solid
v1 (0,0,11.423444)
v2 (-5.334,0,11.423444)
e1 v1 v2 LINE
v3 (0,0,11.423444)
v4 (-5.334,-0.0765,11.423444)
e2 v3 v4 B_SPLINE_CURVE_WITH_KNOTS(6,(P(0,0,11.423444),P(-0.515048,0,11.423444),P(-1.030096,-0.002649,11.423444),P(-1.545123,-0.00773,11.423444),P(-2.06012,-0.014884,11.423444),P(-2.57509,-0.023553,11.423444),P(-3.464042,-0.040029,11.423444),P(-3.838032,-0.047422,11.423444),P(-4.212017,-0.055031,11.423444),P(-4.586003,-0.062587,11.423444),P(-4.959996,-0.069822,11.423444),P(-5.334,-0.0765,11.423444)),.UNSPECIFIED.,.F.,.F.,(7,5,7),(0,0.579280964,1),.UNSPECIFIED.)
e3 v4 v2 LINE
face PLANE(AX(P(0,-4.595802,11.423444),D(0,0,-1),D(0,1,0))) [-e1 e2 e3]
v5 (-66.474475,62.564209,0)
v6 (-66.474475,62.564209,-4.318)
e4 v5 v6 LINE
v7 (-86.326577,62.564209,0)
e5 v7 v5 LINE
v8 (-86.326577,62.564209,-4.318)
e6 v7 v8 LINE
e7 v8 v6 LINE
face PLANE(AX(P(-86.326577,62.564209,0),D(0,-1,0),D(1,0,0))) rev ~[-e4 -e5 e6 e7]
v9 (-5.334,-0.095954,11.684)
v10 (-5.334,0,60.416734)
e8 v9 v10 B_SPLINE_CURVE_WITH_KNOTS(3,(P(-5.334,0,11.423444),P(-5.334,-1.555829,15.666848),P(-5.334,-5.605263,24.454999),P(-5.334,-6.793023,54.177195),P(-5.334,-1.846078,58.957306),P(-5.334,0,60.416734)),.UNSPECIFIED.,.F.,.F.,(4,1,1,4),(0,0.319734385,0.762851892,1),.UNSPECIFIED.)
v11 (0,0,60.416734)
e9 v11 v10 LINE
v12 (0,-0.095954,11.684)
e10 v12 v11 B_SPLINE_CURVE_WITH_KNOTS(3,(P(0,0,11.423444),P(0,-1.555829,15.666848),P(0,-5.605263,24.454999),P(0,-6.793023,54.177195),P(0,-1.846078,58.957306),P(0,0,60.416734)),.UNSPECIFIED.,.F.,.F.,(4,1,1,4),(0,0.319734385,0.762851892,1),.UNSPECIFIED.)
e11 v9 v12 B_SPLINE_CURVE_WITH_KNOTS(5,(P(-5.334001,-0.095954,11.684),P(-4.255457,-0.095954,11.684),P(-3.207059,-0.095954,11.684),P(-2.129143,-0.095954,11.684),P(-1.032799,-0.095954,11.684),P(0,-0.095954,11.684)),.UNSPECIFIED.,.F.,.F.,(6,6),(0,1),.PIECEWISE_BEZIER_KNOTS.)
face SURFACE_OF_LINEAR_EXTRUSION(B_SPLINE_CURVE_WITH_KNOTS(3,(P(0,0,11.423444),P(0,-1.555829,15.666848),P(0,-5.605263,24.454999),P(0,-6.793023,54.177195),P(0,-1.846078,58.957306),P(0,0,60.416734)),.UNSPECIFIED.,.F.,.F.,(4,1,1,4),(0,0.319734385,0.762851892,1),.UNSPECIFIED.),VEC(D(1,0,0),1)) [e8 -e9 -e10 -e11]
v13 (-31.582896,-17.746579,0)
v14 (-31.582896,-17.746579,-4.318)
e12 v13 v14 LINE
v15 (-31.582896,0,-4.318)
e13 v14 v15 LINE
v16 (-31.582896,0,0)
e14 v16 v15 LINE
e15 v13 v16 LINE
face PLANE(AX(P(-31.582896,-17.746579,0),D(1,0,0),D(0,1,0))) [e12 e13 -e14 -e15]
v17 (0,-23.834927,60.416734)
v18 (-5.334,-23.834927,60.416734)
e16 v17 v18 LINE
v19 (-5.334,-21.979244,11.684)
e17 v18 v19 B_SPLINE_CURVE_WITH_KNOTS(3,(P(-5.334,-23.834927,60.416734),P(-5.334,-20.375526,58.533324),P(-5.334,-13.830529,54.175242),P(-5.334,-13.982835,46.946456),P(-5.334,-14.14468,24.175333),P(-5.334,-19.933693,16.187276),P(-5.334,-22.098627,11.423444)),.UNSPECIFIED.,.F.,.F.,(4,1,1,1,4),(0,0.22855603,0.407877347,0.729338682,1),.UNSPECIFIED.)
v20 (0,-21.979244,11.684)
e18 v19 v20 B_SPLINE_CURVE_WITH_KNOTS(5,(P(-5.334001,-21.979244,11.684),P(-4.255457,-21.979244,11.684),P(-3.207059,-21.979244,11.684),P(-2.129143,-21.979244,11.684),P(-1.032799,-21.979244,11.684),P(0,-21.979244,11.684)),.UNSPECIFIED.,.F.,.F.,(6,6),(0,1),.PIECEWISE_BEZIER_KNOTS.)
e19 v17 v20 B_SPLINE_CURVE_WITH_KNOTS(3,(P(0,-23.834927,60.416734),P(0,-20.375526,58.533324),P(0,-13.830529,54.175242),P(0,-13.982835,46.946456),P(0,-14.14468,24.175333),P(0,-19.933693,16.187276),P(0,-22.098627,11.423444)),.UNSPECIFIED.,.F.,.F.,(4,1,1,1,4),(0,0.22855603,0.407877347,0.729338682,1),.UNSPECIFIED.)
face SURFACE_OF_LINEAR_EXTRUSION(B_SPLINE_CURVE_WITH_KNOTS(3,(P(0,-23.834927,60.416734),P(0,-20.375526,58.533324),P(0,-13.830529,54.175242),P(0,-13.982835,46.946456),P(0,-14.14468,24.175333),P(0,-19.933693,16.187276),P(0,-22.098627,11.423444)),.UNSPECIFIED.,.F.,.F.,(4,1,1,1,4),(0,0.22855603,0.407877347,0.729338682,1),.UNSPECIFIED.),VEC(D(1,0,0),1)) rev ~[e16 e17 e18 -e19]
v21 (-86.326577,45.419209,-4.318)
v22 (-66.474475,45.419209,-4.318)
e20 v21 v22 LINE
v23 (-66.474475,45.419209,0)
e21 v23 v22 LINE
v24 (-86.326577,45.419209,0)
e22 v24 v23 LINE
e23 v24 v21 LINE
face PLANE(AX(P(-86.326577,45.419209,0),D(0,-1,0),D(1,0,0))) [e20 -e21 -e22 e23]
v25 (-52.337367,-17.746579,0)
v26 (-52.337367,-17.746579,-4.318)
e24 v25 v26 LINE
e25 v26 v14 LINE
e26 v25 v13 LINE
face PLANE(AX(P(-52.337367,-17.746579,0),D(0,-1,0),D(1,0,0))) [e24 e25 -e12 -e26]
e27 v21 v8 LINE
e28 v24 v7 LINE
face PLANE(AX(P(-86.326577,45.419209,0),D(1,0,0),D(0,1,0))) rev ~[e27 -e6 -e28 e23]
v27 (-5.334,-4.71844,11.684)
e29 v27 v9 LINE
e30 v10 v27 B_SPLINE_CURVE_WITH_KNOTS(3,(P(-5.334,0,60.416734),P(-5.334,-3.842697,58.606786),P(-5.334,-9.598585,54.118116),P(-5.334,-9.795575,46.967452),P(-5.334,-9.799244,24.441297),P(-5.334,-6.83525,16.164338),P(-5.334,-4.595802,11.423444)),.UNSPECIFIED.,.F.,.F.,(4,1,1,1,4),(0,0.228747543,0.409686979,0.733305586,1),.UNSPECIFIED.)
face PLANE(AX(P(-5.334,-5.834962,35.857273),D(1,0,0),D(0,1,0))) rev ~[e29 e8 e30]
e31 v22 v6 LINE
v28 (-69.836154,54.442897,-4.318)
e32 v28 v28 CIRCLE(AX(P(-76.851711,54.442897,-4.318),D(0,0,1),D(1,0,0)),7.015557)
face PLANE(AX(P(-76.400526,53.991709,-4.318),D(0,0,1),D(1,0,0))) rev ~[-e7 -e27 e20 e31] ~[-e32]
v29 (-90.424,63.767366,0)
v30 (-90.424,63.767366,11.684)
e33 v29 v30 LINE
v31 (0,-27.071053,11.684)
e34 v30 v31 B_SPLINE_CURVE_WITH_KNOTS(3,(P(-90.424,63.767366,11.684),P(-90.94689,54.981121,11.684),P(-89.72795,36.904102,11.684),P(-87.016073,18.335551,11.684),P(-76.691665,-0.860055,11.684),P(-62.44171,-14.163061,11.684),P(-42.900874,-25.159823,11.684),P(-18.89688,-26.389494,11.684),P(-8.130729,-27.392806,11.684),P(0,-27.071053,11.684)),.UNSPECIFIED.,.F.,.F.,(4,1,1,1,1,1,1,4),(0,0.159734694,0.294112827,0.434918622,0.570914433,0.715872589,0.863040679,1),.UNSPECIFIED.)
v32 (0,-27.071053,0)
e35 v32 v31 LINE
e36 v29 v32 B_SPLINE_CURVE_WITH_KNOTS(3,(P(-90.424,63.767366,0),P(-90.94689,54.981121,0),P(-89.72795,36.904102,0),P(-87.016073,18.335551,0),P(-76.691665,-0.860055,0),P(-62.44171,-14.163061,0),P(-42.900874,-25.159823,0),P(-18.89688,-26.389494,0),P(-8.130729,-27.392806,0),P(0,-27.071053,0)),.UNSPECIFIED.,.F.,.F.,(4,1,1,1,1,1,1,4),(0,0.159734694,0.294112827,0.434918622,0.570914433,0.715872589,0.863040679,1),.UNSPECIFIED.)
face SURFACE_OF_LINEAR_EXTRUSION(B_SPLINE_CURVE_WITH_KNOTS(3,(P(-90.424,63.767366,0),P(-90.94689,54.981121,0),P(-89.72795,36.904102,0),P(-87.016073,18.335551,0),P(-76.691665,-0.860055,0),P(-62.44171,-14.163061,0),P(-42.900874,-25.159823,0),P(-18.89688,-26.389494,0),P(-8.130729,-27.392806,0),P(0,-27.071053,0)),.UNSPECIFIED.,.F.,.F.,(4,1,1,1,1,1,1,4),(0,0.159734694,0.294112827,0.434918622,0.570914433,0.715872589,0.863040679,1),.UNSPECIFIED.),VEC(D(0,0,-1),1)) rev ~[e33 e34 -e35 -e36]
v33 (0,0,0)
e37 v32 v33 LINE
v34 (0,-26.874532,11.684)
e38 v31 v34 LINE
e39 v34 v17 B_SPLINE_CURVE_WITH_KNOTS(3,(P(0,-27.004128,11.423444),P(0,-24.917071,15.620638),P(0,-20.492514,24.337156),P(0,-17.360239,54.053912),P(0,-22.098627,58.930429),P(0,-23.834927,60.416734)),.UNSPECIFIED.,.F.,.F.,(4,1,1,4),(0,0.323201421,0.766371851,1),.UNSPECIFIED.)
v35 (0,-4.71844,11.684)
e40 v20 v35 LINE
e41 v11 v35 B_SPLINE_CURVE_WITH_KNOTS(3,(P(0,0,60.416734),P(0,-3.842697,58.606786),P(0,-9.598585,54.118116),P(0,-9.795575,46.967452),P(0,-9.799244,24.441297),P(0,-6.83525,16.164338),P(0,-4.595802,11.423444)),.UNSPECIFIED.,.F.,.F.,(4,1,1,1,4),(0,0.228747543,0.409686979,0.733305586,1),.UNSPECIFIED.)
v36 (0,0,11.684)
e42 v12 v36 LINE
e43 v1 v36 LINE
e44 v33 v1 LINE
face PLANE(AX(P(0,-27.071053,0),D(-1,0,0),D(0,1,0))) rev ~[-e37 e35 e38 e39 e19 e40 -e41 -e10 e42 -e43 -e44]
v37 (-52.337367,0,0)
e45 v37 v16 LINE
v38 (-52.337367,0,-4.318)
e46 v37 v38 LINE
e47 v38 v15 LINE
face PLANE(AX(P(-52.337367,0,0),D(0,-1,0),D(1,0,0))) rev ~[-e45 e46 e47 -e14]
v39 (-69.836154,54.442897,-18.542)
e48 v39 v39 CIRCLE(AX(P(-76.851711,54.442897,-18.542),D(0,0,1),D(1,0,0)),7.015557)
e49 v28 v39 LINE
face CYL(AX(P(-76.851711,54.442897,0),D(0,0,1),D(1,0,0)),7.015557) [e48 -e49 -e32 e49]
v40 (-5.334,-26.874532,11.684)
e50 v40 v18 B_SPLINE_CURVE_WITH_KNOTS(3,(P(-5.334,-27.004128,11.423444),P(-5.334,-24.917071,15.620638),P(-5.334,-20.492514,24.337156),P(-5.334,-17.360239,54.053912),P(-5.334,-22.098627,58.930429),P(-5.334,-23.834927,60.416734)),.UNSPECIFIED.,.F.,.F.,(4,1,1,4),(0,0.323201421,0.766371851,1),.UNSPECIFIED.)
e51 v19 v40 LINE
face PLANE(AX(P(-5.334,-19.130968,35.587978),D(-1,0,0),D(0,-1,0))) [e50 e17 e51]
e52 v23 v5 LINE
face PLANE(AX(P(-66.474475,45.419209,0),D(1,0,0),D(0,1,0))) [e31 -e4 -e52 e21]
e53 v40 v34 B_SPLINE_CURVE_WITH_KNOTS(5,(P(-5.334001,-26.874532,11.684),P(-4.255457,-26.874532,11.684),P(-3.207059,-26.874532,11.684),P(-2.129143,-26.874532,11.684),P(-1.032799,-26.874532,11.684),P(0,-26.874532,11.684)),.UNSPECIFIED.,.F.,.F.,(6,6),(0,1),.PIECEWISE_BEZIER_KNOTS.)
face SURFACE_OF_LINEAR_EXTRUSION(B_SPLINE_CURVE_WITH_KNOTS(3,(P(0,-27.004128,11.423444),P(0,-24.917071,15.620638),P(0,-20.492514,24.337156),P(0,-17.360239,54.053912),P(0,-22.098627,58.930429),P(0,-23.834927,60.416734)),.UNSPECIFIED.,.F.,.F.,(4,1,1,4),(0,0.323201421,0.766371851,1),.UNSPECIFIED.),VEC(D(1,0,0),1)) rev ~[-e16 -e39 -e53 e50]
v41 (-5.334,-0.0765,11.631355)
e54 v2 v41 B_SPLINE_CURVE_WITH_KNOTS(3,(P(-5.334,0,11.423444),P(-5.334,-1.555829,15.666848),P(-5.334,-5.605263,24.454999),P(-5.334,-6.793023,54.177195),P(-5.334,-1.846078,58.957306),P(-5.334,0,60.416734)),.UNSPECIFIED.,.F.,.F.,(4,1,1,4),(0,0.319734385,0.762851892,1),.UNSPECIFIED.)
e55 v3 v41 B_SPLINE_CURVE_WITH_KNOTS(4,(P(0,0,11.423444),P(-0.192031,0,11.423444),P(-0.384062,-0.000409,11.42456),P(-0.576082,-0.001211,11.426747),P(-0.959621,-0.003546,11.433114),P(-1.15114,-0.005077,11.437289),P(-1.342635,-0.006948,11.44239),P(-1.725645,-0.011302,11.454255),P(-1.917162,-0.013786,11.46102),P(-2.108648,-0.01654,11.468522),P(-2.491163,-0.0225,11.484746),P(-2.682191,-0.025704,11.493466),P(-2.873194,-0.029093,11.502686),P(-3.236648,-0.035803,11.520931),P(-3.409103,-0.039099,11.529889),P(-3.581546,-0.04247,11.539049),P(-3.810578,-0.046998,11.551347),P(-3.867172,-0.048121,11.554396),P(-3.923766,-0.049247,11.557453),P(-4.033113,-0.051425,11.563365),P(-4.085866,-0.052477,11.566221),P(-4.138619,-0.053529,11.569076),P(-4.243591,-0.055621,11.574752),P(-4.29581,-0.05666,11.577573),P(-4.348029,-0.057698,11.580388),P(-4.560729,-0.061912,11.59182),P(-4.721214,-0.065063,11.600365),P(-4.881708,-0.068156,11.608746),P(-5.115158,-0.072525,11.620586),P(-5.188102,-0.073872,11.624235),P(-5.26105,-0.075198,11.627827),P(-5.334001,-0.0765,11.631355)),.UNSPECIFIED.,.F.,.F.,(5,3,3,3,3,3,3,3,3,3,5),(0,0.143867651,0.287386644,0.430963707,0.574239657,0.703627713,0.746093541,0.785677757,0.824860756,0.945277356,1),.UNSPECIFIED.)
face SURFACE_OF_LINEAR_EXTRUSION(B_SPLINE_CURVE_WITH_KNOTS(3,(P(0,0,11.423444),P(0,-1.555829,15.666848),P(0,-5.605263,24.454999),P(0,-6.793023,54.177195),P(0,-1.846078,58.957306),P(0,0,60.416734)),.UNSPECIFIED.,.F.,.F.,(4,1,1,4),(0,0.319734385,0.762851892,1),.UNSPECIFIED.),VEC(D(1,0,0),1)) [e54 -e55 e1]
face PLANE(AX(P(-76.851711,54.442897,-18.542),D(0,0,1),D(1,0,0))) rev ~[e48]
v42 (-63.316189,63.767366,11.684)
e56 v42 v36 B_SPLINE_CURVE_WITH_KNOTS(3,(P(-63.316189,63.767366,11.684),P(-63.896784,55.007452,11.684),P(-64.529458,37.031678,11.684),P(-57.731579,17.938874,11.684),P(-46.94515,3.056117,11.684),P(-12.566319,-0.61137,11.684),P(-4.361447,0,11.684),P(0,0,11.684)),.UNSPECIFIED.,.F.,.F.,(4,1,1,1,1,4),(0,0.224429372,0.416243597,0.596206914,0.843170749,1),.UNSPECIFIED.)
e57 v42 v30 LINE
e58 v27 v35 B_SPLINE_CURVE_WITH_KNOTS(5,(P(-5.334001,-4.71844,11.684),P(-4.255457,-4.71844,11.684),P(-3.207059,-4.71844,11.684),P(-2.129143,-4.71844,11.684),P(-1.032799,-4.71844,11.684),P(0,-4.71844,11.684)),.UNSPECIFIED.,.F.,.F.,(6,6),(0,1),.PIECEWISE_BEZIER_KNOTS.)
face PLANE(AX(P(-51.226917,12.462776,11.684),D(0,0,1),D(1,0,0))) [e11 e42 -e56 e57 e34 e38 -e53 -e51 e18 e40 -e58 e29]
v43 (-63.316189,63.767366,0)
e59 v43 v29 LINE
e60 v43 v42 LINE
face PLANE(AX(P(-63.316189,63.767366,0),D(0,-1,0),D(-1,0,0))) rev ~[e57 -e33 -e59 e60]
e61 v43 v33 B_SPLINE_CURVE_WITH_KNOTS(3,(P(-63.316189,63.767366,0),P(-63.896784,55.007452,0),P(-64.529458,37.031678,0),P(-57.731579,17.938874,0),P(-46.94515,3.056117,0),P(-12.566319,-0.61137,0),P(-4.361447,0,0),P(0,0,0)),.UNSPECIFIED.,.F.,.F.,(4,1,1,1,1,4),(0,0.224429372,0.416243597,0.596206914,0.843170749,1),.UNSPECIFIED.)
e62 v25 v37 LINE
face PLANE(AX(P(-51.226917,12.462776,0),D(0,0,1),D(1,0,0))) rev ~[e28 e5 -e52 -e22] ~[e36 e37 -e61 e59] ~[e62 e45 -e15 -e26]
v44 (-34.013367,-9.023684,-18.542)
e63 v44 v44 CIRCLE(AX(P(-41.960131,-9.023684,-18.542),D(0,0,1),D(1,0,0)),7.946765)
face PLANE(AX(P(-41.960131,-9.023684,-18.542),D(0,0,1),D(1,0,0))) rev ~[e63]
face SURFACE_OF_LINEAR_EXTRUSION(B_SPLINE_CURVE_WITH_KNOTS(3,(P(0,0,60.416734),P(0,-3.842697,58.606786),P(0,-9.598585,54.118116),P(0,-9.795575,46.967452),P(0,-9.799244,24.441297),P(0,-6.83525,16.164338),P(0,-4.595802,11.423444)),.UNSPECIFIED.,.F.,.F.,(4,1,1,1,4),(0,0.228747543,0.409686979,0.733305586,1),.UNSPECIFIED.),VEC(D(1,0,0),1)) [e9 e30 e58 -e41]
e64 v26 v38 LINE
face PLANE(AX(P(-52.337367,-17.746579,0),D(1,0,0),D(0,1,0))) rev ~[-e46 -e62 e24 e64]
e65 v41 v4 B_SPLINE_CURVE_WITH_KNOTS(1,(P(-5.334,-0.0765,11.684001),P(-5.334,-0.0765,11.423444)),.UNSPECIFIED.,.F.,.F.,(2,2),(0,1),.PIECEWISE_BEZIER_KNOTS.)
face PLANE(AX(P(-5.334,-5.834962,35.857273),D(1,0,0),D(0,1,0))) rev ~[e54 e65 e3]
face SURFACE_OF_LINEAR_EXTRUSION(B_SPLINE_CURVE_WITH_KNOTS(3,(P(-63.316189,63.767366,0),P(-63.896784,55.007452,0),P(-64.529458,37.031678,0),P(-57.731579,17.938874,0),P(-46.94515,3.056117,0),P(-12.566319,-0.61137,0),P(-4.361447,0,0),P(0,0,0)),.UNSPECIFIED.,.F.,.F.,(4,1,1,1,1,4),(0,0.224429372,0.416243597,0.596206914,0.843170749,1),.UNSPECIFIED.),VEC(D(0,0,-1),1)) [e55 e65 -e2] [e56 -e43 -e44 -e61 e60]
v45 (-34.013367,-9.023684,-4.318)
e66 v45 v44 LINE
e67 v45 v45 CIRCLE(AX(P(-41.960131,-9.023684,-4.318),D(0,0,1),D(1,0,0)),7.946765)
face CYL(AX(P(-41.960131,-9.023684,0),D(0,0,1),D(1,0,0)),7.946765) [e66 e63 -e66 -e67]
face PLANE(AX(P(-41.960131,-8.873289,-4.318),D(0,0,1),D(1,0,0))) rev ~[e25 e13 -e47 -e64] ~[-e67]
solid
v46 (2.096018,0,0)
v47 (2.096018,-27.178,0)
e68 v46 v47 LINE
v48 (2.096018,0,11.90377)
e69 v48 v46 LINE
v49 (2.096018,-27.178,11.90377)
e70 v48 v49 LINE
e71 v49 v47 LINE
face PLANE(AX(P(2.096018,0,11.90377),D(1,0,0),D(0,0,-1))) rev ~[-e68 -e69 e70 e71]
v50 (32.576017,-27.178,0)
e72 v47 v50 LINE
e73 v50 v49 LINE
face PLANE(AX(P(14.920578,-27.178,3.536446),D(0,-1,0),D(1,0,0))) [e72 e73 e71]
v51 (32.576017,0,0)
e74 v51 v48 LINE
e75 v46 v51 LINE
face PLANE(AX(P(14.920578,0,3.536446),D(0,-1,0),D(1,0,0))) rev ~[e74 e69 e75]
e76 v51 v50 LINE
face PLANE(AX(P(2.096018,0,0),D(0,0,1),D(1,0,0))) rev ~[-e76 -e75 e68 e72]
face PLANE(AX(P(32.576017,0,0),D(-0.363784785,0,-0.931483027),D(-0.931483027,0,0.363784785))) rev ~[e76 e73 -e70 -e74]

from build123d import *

# Parameters (mm, degrees)
F0_W      = 19.8521018028
F0_H      = 17.1450003982
F1_DEPTH  = 4.318
F0_W_2    = 20.7544714212
F0_H_2    = 17.746578902
F2_R      = 7.0155570226
F3_DEPTH  = 18.542
F4_R      = 7.9467646893
F5_DEPTH  = 18.542
F7_DEPTH  = 11.684
F9_DEPTH  = 5.334
F11_DEPTH = 27.178


# Not quite as in the source:
# - a feature names something its author has since deleted; it is built from what else it names


with BuildPart() as f1:
    # F0 (on Top) → F1 (new body)
    with BuildSketch(Plane.XY):
        with Locations((-76.4005258679, 53.9917089045)):
            Rectangle(F0_W, F0_H)
    extrude(amount=-F1_DEPTH)

    # F2 (on Top) → F3 (join)
    with BuildSketch(Plane.XY):
        with Locations((-76.8517106771, 54.442897439)):
            Circle(F2_R)
    extrude(amount=-F3_DEPTH)



with BuildPart() as f1b:
    # F0 (on Top) → F1, piece 2 (new body)
    with BuildSketch(Plane.XY):
        with Locations((-41.960131377, -8.873289451)):
            Rectangle(F0_W_2, F0_H_2)
    extrude(amount=-F1_DEPTH)

    # F4 (on Top) → F5 (join)
    with BuildSketch(Plane.XY):
        with Locations((-41.960131377, -9.023684077)):
            Circle(F4_R)
    extrude(amount=-F5_DEPTH)


with BuildPart() as f1_1:
    add(f1.part)

    add(f1b.part)  # F7 merges F1b
    # F6 (on Top) → F7 (join)
    with BuildSketch(Plane.XY):
        with BuildLine():
            Line((-63.3161887527, 63.7673661113), (-90.4240001332, 63.7673661113))
            add(Edge.make_bspline(
                [(-90.4240001332, 63.7673661113), (-90.946889777, 54.9811213625), (-89.7279496558, 36.9041024903), (-87.016072715, 18.3355513143), (-76.691665346, -0.8600546564), (-62.441709707, -14.1630605577), (-42.9008739567, -25.1598232125), (-18.8968795163, -26.3894935088), (-8.1307288286, -27.3928058719), (0, -27.0710531622)],
                knots=[0, 0, 0, 0, 0.1597346938, 0.2941128272, 0.434918622, 0.5709144334, 0.7158725886, 0.8630406795, 1, 1, 1, 1], degree=3))
            Line((0, -27.0710531622), (0, 0))
            add(Edge.make_bspline(
                [(-63.3161887527, 63.7673661113), (-63.89678398, 55.0074521155), (-64.5294580411, 37.0316782662), (-57.7315789572, 17.9388743499), (-46.9451503691, 3.0561166092), (-12.5663186528, -0.6113698403), (-4.3614469469, 0), (0, 0)],
                knots=[0, 0, 0, 0, 0.224429372, 0.4162435973, 0.596206914, 0.8431707494, 1, 1, 1, 1], degree=3))
        make_face()
    extrude(amount=F7_DEPTH)

    # F8 (on Right) → F9 (join)
    with BuildSketch(Plane.YZ):
        with BuildLine():
            add(Edge.make_bspline(
                [(-27.004128322, 11.4234443754), (-24.9170712549, 15.6206381214), (-20.4925139948, 24.3371562752), (-17.3602385126, 54.0539118613), (-22.0986272096, 58.9304288492), (-23.8349272719, 60.4167338461)],
                knots=[0, 0, 0, 0, 0.323201421, 0.7663718509, 1, 1, 1, 1], degree=3))
            Line((-27.004128322, 11.4234443754), (-22.0986272096, 11.4234443754))
            add(Edge.make_bspline(
                [(-23.8349272719, 60.4167338461), (-20.3755259414, 58.5333244768), (-13.8305290902, 54.1752420005), (-13.9828351318, 46.9464555143), (-14.1446804387, 24.1753330063), (-19.9336931034, 16.1872758203), (-22.0986272096, 11.4234443754)],
                knots=[0, 0, 0, 0, 0.2285560301, 0.4078773473, 0.7293386816, 1, 1, 1, 1], degree=3))
        make_face()
        with BuildLine():
            Line((-4.5958016999, 11.4234443754), (0, 11.4234443754))
            add(Edge.make_bspline(
                [(0, 11.4234443754), (-1.5558292644, 15.6668477759), (-5.6052633039, 24.4549985378), (-6.7930231719, 54.1771953118), (-1.846077584, 58.9573064034), (0, 60.4167338461)],
                knots=[0, 0, 0, 0, 0.3197343851, 0.7628518919, 1, 1, 1, 1], degree=3))
            add(Edge.make_bspline(
                [(0, 60.4167338461), (-3.8426967978, 58.6067863753), (-9.5985845649, 54.1181159991), (-9.7955748005, 46.9674516518), (-9.7992443925, 24.4412973301), (-6.835249773, 16.1643384386), (-4.5958016999, 11.4234443754)],
                knots=[0, 0, 0, 0, 0.2287475428, 0.4096869795, 0.733305586, 1, 1, 1, 1], degree=3))
        make_face()
    extrude(amount=-F9_DEPTH)


with BuildPart() as f11:
    # F10 (on Front) → F11 (new body)
    with BuildSketch(Plane.XZ):
        Polygon((32.5760170817, 0), (2.0960178226, 11.903770268), (2.0960178226, 0), align=None)
    extrude(amount=F11_DEPTH)


solid = Compound([f1_1.part, f11.part])
